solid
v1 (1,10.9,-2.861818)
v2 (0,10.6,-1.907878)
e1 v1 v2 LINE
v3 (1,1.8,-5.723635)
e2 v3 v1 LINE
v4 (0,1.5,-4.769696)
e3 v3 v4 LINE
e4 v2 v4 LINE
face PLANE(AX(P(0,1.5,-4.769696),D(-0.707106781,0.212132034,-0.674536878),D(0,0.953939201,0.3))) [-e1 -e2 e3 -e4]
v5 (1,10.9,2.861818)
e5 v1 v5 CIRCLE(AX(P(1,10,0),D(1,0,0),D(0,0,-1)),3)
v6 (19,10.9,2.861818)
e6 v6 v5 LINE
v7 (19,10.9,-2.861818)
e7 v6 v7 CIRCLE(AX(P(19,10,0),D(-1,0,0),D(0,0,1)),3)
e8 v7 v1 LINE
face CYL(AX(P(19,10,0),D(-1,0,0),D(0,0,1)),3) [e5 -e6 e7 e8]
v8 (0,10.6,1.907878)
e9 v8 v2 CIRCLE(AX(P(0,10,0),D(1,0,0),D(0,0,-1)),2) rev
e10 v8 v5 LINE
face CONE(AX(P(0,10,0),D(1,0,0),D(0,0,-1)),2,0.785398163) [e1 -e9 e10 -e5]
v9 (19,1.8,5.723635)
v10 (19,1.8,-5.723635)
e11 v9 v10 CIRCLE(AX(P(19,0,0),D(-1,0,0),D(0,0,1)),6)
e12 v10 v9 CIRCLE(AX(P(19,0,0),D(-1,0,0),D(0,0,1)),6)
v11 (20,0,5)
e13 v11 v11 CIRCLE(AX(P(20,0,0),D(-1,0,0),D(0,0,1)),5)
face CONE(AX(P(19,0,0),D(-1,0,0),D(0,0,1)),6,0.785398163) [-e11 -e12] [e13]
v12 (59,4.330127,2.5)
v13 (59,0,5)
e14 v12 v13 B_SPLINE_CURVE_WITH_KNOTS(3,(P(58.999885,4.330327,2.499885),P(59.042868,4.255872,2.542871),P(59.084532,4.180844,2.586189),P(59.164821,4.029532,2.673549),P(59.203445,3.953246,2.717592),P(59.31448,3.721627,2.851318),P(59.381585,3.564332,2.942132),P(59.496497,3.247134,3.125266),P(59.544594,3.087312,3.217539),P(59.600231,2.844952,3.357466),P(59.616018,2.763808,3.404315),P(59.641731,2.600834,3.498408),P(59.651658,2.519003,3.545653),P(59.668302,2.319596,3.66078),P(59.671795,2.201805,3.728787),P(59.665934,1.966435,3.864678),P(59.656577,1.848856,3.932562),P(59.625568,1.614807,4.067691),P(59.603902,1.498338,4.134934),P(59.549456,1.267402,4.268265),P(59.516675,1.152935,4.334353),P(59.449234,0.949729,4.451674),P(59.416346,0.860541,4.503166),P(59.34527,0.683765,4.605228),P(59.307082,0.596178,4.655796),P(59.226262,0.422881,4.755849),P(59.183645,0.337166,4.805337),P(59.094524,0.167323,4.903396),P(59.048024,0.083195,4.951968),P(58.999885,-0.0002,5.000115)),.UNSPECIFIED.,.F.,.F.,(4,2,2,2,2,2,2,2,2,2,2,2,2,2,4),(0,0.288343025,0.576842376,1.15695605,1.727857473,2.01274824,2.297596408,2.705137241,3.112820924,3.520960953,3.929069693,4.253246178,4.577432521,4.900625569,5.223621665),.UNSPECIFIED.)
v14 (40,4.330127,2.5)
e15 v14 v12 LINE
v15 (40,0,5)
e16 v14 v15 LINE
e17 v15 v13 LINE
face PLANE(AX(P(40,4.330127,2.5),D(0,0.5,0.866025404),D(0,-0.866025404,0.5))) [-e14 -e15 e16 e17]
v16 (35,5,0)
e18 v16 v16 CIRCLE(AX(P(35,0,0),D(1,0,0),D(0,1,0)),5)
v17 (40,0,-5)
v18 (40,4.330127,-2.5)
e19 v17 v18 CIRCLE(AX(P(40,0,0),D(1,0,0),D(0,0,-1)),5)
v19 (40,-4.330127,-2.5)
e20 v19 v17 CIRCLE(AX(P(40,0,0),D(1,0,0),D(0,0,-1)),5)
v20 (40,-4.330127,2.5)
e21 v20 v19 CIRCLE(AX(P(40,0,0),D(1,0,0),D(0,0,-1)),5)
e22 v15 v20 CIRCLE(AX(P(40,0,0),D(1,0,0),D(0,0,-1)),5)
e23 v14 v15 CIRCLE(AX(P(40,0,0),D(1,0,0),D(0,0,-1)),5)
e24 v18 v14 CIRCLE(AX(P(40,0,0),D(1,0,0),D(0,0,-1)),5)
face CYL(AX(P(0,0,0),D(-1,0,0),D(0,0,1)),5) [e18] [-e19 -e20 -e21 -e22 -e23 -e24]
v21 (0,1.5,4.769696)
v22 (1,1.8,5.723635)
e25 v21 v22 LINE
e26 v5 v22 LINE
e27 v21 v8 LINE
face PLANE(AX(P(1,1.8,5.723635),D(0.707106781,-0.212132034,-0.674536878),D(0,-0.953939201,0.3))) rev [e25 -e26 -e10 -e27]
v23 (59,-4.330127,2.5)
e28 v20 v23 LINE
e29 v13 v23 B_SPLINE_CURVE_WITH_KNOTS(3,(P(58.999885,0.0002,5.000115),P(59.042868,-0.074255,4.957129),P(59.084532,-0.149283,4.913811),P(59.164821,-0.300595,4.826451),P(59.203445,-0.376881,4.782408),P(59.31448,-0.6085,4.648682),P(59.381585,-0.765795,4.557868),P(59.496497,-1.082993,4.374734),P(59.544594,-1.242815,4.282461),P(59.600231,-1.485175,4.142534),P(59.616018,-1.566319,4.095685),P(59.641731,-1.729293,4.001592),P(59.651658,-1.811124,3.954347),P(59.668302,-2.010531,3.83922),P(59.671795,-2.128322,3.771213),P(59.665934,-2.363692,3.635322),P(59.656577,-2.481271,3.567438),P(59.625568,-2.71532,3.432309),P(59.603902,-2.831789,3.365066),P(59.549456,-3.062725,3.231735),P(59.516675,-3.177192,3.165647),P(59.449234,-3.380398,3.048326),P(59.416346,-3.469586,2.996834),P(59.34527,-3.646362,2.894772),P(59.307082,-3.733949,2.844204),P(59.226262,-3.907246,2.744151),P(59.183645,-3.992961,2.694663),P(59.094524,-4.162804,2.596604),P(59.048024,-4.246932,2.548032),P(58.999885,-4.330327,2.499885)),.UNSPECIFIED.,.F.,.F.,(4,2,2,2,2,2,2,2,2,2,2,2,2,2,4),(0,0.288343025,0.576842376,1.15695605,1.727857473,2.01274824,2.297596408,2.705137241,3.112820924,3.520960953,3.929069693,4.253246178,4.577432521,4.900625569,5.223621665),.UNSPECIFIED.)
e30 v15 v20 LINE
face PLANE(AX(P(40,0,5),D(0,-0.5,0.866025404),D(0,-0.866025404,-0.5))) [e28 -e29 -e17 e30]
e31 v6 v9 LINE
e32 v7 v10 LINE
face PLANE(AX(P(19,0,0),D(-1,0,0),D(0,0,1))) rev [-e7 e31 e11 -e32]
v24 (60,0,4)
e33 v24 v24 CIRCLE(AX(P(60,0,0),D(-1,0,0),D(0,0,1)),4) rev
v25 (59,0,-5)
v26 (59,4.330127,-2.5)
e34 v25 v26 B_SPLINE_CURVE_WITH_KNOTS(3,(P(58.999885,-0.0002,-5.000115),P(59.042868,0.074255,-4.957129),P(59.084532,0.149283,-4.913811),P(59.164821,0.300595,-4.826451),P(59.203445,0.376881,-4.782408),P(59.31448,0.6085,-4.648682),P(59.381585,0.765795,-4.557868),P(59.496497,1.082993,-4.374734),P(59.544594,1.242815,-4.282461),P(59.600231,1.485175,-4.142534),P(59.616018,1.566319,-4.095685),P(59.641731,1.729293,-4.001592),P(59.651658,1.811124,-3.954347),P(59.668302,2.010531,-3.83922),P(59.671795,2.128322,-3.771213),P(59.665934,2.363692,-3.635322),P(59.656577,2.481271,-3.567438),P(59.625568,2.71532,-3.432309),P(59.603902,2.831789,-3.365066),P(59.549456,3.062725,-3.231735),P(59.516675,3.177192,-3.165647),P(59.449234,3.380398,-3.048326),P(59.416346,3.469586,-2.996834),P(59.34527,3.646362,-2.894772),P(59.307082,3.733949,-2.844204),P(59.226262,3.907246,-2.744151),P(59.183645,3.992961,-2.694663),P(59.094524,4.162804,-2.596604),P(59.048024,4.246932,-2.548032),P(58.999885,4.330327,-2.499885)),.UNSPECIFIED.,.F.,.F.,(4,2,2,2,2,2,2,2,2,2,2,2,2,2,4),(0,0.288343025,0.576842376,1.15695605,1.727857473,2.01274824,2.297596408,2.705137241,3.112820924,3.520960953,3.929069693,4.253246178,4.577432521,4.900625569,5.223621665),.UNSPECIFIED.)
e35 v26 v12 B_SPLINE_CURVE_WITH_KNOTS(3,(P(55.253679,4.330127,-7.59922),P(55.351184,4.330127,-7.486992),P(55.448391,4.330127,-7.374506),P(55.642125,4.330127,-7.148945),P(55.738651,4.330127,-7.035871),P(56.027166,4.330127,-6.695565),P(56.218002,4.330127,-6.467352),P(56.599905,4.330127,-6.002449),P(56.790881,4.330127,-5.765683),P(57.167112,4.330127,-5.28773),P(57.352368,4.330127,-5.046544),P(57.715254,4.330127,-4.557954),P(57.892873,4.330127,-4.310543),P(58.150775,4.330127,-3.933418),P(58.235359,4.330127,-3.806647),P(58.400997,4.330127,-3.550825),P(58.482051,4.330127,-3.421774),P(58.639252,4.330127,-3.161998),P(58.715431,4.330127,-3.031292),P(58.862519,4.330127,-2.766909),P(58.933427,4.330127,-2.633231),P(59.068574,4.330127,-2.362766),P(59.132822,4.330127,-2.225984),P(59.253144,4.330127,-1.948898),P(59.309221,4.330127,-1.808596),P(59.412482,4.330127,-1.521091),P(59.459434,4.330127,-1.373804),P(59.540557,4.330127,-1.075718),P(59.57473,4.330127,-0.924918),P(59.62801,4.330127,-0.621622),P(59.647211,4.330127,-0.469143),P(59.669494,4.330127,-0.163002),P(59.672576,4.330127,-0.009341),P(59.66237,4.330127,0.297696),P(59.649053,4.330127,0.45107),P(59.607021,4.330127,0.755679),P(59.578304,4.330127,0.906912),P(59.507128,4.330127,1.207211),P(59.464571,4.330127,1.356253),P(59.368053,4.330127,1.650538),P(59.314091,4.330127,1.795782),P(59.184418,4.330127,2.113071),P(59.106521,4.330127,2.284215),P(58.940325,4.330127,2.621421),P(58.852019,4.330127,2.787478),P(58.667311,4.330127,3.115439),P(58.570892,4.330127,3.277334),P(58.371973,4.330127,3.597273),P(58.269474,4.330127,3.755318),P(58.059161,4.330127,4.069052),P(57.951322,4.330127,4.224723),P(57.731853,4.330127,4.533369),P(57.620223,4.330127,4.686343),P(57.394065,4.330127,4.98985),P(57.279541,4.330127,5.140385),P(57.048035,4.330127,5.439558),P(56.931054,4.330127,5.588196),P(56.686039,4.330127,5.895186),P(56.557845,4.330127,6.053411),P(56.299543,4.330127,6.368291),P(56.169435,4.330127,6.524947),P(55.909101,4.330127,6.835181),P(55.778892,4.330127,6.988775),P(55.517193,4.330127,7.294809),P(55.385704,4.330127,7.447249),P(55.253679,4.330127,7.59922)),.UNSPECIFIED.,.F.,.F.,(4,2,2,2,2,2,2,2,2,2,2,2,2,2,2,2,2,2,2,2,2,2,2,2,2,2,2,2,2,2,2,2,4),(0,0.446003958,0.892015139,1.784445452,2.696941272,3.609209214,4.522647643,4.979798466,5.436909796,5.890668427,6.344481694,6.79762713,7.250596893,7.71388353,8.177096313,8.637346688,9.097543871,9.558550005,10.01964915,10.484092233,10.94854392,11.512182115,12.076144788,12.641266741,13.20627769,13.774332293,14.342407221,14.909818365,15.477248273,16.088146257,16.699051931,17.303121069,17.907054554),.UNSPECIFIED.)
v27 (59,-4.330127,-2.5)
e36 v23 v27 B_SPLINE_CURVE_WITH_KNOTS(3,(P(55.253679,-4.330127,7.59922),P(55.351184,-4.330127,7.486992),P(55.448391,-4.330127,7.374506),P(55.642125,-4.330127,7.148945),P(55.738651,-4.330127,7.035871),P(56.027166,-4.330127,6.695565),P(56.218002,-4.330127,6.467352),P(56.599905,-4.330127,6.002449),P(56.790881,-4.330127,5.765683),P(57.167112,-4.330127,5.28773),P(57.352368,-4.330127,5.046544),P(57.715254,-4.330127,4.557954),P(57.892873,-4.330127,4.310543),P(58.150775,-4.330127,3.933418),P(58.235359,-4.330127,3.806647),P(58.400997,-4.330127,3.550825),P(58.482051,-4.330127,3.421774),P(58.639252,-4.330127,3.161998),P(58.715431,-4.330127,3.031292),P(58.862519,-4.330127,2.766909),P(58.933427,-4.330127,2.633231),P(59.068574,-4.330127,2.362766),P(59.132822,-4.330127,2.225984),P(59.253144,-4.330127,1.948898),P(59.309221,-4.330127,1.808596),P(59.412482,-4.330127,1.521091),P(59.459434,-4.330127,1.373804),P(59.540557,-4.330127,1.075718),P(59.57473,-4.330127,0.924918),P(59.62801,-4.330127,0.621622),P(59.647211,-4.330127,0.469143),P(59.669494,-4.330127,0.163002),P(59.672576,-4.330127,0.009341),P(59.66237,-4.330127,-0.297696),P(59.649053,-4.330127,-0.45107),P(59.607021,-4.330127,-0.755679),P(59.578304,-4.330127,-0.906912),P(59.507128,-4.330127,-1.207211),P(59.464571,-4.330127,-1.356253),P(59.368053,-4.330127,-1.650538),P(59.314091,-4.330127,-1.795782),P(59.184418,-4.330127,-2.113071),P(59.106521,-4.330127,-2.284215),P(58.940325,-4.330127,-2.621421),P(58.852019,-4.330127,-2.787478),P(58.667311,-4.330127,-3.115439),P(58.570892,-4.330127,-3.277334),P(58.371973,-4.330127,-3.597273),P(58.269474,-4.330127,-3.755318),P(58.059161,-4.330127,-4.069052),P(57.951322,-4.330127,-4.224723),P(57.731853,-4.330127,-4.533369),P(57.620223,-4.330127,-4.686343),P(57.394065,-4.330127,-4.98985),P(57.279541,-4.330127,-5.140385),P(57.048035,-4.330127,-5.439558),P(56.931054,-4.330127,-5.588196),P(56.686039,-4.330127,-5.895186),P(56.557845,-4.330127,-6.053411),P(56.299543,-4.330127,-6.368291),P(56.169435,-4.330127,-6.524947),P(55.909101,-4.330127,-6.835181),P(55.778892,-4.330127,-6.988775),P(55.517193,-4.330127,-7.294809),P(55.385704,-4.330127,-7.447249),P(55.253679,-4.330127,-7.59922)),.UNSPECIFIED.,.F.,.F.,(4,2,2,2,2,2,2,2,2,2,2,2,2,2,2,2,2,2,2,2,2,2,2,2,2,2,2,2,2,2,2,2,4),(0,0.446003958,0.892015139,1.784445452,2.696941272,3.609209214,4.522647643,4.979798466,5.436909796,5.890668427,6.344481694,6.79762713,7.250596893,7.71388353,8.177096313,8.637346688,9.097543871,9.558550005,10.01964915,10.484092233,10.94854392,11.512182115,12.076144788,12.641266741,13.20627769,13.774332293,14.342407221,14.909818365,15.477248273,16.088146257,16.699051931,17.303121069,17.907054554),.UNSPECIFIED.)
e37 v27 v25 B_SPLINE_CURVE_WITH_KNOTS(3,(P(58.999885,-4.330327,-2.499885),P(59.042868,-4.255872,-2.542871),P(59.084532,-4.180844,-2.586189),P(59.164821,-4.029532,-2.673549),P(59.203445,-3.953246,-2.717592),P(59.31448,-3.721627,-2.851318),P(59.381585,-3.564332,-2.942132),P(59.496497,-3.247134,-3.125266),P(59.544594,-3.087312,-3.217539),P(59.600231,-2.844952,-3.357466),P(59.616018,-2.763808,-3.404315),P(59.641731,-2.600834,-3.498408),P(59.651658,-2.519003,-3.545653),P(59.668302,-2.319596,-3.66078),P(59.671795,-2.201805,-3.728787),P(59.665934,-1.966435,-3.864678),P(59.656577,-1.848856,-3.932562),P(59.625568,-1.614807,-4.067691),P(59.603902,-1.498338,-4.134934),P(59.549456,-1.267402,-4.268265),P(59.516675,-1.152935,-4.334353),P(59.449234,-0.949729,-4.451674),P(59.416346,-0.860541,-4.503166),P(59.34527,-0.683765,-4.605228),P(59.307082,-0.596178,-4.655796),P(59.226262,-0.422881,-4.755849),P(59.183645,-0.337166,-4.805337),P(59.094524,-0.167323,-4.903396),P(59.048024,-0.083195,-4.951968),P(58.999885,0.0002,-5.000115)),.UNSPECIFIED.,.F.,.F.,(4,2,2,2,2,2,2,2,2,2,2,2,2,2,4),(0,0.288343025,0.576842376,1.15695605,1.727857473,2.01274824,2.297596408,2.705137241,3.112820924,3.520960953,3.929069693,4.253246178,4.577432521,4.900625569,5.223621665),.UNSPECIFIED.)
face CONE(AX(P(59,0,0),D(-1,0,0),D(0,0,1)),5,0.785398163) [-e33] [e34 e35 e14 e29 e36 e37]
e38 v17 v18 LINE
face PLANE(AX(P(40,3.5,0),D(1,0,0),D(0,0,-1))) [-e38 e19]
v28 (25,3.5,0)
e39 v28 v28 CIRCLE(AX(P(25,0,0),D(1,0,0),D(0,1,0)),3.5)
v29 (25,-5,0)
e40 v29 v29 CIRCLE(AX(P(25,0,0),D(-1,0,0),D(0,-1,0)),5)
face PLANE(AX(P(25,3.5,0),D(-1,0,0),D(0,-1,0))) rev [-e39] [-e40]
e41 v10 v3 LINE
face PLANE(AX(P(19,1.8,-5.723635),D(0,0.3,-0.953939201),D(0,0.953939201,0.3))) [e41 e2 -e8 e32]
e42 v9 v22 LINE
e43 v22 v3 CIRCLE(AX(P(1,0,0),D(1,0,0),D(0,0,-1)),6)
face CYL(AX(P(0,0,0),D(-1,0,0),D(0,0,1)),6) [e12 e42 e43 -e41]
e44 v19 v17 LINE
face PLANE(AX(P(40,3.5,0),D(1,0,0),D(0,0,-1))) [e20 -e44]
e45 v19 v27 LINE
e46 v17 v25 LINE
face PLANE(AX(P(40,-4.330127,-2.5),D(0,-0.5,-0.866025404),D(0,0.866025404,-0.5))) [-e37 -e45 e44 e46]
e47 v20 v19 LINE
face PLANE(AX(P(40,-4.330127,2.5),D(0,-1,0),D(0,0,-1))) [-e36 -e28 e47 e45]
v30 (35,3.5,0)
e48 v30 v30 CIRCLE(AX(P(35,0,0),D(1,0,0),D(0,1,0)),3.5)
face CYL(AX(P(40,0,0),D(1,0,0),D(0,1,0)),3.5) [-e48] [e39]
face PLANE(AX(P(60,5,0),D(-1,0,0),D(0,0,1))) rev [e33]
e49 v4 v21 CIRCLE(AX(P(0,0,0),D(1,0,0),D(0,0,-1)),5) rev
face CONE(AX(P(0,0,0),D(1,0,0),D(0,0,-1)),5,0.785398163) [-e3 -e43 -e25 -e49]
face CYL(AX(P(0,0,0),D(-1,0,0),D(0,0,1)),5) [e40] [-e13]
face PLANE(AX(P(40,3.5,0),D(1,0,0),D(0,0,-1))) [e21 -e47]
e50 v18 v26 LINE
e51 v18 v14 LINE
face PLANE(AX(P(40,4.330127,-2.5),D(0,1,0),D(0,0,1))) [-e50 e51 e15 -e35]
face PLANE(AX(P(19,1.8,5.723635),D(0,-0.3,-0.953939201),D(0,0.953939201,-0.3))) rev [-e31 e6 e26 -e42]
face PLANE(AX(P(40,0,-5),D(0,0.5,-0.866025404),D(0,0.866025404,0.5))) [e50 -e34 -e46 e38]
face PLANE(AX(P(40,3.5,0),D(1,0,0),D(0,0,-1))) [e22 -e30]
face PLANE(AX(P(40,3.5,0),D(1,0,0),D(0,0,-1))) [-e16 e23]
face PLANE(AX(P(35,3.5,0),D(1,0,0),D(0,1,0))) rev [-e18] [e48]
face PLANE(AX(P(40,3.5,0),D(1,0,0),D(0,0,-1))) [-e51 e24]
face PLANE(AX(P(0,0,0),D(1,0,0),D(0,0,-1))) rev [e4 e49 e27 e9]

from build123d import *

# Parameters (mm, degrees)
CHAMFER1_SIZE       = 1
BOSS_EXTRUDE1_START = -19
BOSS_EXTRUDE1_DEPTH = 19
CHAMFER2_SIZE       = 1
SKETCH3_OUTSIDE_W   = 26.814
SKETCH3_OUTSIDE_H   = 33.814
CUT_EXTRUDE1_DEPTH  = 20
SKETCH4_W           = 10
SKETCH4_H           = 4.464883459


with BuildPart() as part:
    # Sketch1 → Revolve1 (revolve)
    with BuildSketch(Plane.XY, mode=Mode.PRIVATE) as revolve1_sk:
        Polygon((0, 0), (0, 6), (20, 6), (20, 5), (60, 5), (60, 0), align=None)
    revolve(revolve1_sk.sketch.rotate(Axis((0, 0, 0), (1, 0, 0)), 90), axis=Axis((0, 0, 0), (1, 0, 0)))

    # Chamfer1
    chamfer1_edges = [part.edges().sort_by_distance(p)[0] for p in [
        (60, 0, -5),
        (20, 0, -6),
    ]]
    chamfer(chamfer1_edges, length=CHAMFER1_SIZE - 0.0001)  # a hair under: the kernel refuses the full size

    # Sketch2 → Boss-Extrude1 (add)
    with BuildSketch(Plane.ZY.offset(BOSS_EXTRUDE1_START)):
        with BuildLine():
            ThreePointArc((2.861817604, 10.9), (0, 13), (-2.861817604, 10.9))
            Line((-2.861817604, 10.9), (-5.723635209, 1.8))
            ThreePointArc((-5.723635209, 1.8), (0, 6), (5.723635209, 1.8))
            Line((5.723635209, 1.8), (2.861817604, 10.9))
        make_face()
    extrude(amount=BOSS_EXTRUDE1_DEPTH)

    # Chamfer2
    chamfer2_edges = [part.edges().sort_by_distance(p)[0] for p in [
        (0, -5.930506355, -0.910546196),
        (0, 6.35, 4.292726406),
        (0, 13, 0),
        (0, 6.35, -4.292726406),
    ]]
    chamfer(chamfer2_edges, length=CHAMFER2_SIZE)

    # Sketch3 outside → Cut-Extrude1 (cut)
    with BuildSketch(Plane(origin=(60, 0, 0), x_dir=(0, 0, -1), z_dir=(1, 0, 0))):
        with Locations((0, 3.5)):
            Rectangle(SKETCH3_OUTSIDE_W, SKETCH3_OUTSIDE_H)
        Polygon((5, 0), (2.5, 4.330127019), (-2.5, 4.330127019), (-5, 0), (-2.5, -4.330127019), (2.5, -4.330127019), align=None, mode=Mode.SUBTRACT)
    extrude(amount=-CUT_EXTRUDE1_DEPTH, mode=Mode.SUBTRACT)

    # Sketch4 → Cut-Revolve1 (revolve, cut)
    with BuildSketch(Plane.XY, mode=Mode.PRIVATE) as cut_revolve1_sk:
        with Locations((30, 5.732441729)):
            Rectangle(SKETCH4_W, SKETCH4_H)
    revolve(cut_revolve1_sk.sketch.rotate(Axis((40, 0, 0), (-1, 0, 0)), 270), axis=Axis((40, 0, 0), (-1, 0, 0)), mode=Mode.SUBTRACT)


solid = part.part
